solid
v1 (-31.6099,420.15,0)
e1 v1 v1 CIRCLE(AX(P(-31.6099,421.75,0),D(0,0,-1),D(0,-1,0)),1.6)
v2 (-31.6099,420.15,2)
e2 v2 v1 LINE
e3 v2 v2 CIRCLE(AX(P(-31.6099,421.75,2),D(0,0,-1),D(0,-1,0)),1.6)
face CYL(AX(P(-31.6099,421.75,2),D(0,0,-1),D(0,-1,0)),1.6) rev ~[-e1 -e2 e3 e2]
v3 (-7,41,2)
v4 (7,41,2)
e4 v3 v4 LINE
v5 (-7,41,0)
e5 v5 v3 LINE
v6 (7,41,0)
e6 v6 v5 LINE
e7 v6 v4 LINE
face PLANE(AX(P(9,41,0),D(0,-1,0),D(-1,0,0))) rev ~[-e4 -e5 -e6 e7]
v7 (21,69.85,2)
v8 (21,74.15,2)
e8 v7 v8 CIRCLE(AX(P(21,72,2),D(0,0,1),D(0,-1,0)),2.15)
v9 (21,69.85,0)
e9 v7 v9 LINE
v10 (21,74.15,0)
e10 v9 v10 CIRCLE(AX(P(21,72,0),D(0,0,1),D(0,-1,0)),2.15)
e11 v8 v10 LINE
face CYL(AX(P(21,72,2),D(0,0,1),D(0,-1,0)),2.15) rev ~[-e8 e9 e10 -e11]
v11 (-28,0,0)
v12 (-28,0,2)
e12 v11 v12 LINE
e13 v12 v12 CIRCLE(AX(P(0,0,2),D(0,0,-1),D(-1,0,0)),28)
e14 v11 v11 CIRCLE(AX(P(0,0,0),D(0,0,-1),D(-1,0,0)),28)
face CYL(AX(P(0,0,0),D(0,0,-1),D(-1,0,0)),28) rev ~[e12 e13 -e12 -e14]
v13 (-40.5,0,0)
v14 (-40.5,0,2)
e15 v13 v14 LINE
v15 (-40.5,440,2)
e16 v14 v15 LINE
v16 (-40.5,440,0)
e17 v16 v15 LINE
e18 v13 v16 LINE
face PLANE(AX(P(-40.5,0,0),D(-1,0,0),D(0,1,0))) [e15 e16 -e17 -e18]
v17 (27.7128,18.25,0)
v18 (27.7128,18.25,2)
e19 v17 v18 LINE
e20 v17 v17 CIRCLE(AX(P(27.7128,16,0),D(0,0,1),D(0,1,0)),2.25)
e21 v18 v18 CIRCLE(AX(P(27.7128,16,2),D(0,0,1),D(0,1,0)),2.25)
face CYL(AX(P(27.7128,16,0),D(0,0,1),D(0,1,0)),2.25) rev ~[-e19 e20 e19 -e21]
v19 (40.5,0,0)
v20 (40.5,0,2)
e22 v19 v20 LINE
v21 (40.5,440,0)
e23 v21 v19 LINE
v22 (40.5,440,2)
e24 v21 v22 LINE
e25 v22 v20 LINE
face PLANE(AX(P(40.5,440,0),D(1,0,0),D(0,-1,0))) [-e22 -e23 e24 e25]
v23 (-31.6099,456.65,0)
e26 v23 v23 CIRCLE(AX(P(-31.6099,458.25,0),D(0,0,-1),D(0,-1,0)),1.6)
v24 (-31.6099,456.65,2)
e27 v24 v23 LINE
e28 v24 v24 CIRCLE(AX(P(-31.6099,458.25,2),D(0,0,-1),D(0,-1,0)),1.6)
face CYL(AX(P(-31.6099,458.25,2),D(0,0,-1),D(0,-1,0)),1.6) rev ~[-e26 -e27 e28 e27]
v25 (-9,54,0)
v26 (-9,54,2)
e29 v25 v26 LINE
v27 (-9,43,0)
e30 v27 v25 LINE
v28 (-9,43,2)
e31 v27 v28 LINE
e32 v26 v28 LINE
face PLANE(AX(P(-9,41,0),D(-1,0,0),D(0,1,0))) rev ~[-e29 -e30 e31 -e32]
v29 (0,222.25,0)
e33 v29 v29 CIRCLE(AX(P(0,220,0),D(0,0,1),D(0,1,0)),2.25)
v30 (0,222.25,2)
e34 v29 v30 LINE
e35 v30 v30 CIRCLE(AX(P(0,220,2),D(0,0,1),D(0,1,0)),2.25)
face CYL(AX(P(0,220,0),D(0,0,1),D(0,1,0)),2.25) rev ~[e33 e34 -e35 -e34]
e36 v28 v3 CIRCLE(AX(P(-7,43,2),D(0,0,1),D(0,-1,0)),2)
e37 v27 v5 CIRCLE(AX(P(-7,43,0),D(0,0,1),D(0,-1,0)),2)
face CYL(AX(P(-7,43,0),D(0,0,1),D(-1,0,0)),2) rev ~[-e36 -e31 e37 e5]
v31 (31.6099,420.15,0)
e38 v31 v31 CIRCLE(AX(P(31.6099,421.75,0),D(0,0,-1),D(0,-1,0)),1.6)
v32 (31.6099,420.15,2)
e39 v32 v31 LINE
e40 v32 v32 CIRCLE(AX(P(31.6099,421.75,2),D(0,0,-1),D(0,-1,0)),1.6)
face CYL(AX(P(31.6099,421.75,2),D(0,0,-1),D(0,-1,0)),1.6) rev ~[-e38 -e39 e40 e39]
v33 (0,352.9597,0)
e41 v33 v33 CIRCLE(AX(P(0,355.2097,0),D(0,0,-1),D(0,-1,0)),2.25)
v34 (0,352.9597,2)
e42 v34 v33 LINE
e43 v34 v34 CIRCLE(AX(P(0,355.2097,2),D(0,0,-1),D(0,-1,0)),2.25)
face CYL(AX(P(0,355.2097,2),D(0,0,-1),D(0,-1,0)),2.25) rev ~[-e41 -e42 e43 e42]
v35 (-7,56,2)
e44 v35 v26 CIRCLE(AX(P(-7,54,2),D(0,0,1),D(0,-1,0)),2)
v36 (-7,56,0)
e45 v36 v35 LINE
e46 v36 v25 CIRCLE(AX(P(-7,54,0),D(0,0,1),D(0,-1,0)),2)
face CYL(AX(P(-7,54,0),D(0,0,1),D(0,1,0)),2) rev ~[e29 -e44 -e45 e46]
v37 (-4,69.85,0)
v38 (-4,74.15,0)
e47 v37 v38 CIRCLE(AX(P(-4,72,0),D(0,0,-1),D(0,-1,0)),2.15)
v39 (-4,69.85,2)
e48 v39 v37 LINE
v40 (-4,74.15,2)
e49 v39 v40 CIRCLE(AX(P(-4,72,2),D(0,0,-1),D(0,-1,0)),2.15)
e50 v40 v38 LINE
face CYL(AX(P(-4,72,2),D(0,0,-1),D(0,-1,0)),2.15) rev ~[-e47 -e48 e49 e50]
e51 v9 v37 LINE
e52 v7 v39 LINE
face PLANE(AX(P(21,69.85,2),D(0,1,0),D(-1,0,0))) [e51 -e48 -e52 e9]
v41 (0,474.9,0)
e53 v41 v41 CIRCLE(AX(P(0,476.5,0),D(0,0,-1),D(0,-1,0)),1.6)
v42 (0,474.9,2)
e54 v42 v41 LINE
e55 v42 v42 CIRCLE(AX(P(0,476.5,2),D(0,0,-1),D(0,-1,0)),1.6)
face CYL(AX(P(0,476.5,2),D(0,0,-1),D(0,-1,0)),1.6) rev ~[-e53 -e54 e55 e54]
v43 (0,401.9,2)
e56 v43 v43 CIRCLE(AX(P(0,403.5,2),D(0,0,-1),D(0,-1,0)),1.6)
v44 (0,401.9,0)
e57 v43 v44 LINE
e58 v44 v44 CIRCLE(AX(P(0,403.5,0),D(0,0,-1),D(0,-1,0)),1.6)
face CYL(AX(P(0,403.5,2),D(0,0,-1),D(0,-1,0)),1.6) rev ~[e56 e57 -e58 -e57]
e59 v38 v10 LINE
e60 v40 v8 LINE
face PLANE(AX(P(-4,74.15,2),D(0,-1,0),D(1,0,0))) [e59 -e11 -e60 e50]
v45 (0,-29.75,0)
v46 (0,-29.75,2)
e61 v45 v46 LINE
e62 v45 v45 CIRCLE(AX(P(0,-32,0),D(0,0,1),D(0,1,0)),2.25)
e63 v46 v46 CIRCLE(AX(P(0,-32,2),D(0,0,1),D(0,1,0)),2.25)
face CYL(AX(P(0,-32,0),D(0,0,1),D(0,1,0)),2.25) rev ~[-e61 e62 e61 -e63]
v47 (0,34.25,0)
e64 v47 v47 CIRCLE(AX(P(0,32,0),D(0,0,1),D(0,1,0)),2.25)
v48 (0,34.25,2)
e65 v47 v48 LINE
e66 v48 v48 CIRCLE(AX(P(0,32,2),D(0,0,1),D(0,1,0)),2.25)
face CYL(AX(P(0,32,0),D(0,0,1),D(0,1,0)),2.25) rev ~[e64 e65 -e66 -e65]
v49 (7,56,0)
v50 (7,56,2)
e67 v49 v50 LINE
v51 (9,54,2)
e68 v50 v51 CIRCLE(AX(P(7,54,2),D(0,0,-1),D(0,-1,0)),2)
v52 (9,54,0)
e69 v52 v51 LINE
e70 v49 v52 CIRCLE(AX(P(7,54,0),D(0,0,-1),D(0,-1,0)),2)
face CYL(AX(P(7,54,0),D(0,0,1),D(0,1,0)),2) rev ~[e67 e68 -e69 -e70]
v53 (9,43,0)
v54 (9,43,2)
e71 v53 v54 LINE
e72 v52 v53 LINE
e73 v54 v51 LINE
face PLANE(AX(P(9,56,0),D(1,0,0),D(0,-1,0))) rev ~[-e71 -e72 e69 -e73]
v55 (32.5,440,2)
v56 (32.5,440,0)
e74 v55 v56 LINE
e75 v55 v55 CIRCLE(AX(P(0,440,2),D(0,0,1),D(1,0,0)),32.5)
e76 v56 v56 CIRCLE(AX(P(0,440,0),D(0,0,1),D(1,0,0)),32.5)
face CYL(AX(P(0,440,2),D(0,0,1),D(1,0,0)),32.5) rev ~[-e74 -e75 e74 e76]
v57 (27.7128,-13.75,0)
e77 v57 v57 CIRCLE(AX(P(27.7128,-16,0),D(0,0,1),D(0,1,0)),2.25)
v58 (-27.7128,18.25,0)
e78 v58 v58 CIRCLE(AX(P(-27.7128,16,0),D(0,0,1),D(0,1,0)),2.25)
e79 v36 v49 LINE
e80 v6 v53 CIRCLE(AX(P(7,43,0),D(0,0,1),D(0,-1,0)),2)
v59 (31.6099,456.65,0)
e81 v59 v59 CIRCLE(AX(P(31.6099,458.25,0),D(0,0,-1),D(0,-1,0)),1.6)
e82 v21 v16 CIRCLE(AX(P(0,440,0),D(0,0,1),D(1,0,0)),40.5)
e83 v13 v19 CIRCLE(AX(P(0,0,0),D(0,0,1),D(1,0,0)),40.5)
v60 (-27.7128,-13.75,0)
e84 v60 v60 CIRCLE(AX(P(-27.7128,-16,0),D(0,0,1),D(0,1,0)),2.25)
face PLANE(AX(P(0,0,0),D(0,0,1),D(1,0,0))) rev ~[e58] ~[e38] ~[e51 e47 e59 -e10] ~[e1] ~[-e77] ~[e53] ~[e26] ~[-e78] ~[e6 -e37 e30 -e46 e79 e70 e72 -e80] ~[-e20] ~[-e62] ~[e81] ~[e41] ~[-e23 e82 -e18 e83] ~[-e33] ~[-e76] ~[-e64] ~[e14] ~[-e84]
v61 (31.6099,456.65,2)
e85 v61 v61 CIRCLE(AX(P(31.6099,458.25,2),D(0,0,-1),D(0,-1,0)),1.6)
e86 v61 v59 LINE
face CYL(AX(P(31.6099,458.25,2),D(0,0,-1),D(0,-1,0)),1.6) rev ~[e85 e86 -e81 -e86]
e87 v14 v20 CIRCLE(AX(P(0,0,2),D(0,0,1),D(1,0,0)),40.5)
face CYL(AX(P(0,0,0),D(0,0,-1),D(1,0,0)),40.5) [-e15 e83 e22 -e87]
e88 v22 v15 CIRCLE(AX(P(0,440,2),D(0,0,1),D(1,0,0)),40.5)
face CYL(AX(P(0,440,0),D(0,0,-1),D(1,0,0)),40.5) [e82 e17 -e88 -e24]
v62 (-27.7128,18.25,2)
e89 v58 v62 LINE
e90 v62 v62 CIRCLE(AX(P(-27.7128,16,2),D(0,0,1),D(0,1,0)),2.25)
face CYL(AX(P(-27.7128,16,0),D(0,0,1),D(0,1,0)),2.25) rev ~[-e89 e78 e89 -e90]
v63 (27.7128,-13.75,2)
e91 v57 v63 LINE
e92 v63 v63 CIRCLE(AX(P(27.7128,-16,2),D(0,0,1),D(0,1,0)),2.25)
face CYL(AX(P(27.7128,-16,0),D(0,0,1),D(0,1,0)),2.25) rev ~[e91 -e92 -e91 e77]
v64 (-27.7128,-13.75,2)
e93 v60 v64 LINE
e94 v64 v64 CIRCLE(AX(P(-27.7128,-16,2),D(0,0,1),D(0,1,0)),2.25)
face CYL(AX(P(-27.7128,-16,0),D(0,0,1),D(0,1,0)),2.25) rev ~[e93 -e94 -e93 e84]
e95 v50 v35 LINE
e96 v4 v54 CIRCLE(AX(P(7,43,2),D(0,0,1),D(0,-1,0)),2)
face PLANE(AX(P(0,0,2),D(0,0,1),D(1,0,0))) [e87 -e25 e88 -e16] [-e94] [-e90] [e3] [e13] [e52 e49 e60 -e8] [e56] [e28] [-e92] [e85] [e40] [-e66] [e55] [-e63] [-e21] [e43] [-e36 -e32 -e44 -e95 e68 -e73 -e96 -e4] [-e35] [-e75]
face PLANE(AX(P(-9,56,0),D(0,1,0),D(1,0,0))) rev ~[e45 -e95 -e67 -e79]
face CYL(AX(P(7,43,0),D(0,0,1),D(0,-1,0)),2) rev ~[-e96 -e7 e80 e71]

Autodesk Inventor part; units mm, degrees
ref_plane "YZ Plane" through (0, 0, 0) normal (1, 0, 0) x (0, 1, 0)
ref_plane "XZ Plane" through (0, 0, 0) normal (0, 1, 0) x (-1, 0, 0)
ref_plane "XY Plane" through (0, 0, 0) normal (0, 0, 1) x (1, 0, 0)
sketch "スケッチ1" plane through (0, 0, 0) normal (0, 0, 1) x (1, 0, 0)
  circle A0 centre (0, 0) radius 40.5
  circle A1 centre (0, 440) radius 40.5
  line L0 (-40.5, 0) -> (-40.5, 440)
  line L1 (40.5, 440) -> (40.5, 0)
  dimension "d0" = 81
  dimension "d1" = 81
  dimension "d2" = 440
extrude "プレート1" add sketch "スケッチ1" along normal blind 2
sketch "スケッチ4" plane through (0, 0, 0) normal (0, 0, -1) x (-1, 0, 0)
  circle A0 centre (0, 0) radius 28
  dimension "d28" = 56
extrude "押し出し1" cut sketch "スケッチ4" against normal blind 10
sketch "スケッチ5" plane through (0, 0, 0) normal (0, 0, -1) x (-1, 0, 0)
  circle A0 centre (0, 0) radius 32
  point P0 (0, 32)
  point P1 (-27.7128, 16)
  point P2 (-27.7128, -16)
  point P3 (0, -32)
  point P4 (27.7128, -16)
  point P5 (27.7128, 16)
  dimension "d31" = 64
  dimension "d34" = 360
hole "穴3" at (0, 32, 0) at (27.7128, 16, 0) at (27.7128, -16, 0) at (0, -32, 0) at (-27.7128, -16, 0) at (-27.7128, 16, 0) direction (0, 0, 1) diameter 4.5 end through all clearance for "Flat Head Machine Screw" size "M4" standard "Ansi Metric M Profile"
sketch "スケッチ6" plane through (0, 0, 2) normal (0, 0, 1) x (1, 0, 0)
  arc A0 (40.5, 440) -> (-40.5, 440) centre (0, 440) ccw projected
  circle A1 centre (0, 440) radius 32.5
  point P0 (0, 0)
  dimension "d43" = 65
extrude "押し出し2" cut sketch "スケッチ6" against normal blind 10
sketch "スケッチ9" plane through (0, 0, 2) normal (0, 0, 1) x (1, 0, 0)
  arc A0 (40.5, 440) -> (-40.5, 440) centre (0, 440) ccw projected
  circle A1 centre (0, 440) radius 36.5
  point P0 (0, 0)
  point P1 (0, 476.5)
  point P2 (-31.6099, 458.25)
  point P3 (-31.6099, 421.75)
  point P4 (0, 403.5)
  point P5 (31.6099, 421.75)
  point P6 (31.6099, 458.25)
  dimension "d58" = 73
  dimension "d61" = 360
hole "穴5" at (0, 476.5, 2) at (-31.6099, 458.25, 2) at (-31.6099, 421.75, 2) at (0, 403.5, 2) at (31.6099, 421.75, 2) at (31.6099, 458.25, 2) direction (0, 0, -1) diameter 3.2 end through all clearance for "Socket Head Cap Screw" size "M3" standard "Ansi Metric M Profile"
sketch "スケッチ16" plane through (0, 0, 2) normal (0, 0, 1) x (1, 0, 0)
  circle A0 centre (0, 355.2097) radius 4
  arc A1 (40.5, 440) -> (-40.5, 440) centre (0, 440) ccw projected
  circle A2 centre (0, 440) radius 25
  line L0 (-23.4923, 431.4495) -> (4.1883, 355.3977)
  line L1 (0, 603.9) -> (0, -147.9) projected
  point P0 (0, 0)
  dimension "d154" = 50
  dimension "d135" = 8
  dimension "d136" = 0
  dimension "d137" = 160
hole "穴11" at (0, 355.2097, 2) direction (0, 0, -1) diameter 4.5 end through all clearance for "Flat Head Machine Screw" size "M4" standard "Ansi Metric M Profile"
sketch "スケッチ17" plane through (0, 0, 2) normal (0, 0, 1) x (1, 0, 0)
  circle A0 centre (0, 0) radius 44
  point P0 (-4, 72)
  dimension "d145" = 88
  dimension "d177" = 72
  dimension "d178" = 4
hole "穴12" at (-4, 72, 2) direction (0, 0, -1) diameter 4.3 end through all clearance for "Flat Head Machine Screw" size "M4" standard "Ansi Metric M Profile"
sketch "スケッチ18" plane through (0, 0, 0) normal (0, 0, -1) x (-1, 0, 0)
  line L0 (-9, 41) -> (9, 41)
  line L1 (9, 41) -> (9, 56)
  line L2 (9, 56) -> (-9, 56)
  line L3 (-9, 56) -> (-9, 41)
  line L4 (-9, 41) -> (9, 56) construction
  line L5 (9, 41) -> (-9, 56) construction
  arc A0 (40.5, 440) -> (-40.5, 440) centre (0, 440) ccw projected
  point P0 (0, 0)
  point P1 (0, 48.5)
  point P2 (0, 48.5)
  dimension "d157" = 18
  dimension "d158" = 15
  dimension "d183" = 41
extrude "押し出し4" cut sketch "スケッチ18" against normal blind 10
fillet "コーナーR2" radius 2 4 edges at (-9, 56, 1) (9, 56, 1) (9, 41, 1) (-9, 41, 1)
sketch "スケッチ19" plane through (0, 0, 2) normal (0, 0, 1) x (1, 0, 0)
  line L0 (21, 72) -> (-4, 72) construction
  line L1 (21, 69.85) -> (-4, 69.85)
  line L2 (-4, 74.15) -> (21, 74.15)
  arc A0 (21, 69.85) -> (21, 74.15) centre (21, 72) ccw
  arc A1 (-4, 74.15) -> (-4, 69.85) centre (-4, 72) ccw
  circle A2 centre (-4, 72) radius 2.15 projected
  point P0 (0, 0)
  point P1 (8.5, 72)
  dimension "d182" = 21
extrude "押し出し5" cut sketch "スケッチ19" against normal blind 10
sketch "スケッチ20" plane through (0, 0, 0) normal (0, 0, -1) x (-1, 0, 0)
  point P0 (0, 0)
  point P1 (0, 220)
  dimension "d167" = 220
hole "穴13" at (0, 220, 0) direction (0, 0, 1) diameter 4.5 end through all clearance for "Flat Head Machine Screw" size "M4" standard "Ansi Metric M Profile"
equation "\"d41\" = Thickness"
equation "\"d68\" = Thickness"
equation "\"d143\" = Thickness"
equation "\"d152\" = Thickness"
equation "\"d173\" = Thickness"
equation "\"d3\" = Thickness"
equation "\"BendRadius\" = Thickness"
equation "\"BendReliefWidth\" = Thickness"
equation "\"BendReliefDepth\" = 0.5 * Thickness"
equation "\"CornerReliefSize\" = 4 * Thickness"
equation "\"MinimumRemnant\" = 2 * Thickness"
equation "\"TransitionRadius\" = BendRadius"
equation "\"JacobiRadiusSize\" = Thickness"
equation "\"GapSize\" = Thickness"
equation "\"Thickness\" = 2"
properties part number "link2-plate2" material "CFRP"
